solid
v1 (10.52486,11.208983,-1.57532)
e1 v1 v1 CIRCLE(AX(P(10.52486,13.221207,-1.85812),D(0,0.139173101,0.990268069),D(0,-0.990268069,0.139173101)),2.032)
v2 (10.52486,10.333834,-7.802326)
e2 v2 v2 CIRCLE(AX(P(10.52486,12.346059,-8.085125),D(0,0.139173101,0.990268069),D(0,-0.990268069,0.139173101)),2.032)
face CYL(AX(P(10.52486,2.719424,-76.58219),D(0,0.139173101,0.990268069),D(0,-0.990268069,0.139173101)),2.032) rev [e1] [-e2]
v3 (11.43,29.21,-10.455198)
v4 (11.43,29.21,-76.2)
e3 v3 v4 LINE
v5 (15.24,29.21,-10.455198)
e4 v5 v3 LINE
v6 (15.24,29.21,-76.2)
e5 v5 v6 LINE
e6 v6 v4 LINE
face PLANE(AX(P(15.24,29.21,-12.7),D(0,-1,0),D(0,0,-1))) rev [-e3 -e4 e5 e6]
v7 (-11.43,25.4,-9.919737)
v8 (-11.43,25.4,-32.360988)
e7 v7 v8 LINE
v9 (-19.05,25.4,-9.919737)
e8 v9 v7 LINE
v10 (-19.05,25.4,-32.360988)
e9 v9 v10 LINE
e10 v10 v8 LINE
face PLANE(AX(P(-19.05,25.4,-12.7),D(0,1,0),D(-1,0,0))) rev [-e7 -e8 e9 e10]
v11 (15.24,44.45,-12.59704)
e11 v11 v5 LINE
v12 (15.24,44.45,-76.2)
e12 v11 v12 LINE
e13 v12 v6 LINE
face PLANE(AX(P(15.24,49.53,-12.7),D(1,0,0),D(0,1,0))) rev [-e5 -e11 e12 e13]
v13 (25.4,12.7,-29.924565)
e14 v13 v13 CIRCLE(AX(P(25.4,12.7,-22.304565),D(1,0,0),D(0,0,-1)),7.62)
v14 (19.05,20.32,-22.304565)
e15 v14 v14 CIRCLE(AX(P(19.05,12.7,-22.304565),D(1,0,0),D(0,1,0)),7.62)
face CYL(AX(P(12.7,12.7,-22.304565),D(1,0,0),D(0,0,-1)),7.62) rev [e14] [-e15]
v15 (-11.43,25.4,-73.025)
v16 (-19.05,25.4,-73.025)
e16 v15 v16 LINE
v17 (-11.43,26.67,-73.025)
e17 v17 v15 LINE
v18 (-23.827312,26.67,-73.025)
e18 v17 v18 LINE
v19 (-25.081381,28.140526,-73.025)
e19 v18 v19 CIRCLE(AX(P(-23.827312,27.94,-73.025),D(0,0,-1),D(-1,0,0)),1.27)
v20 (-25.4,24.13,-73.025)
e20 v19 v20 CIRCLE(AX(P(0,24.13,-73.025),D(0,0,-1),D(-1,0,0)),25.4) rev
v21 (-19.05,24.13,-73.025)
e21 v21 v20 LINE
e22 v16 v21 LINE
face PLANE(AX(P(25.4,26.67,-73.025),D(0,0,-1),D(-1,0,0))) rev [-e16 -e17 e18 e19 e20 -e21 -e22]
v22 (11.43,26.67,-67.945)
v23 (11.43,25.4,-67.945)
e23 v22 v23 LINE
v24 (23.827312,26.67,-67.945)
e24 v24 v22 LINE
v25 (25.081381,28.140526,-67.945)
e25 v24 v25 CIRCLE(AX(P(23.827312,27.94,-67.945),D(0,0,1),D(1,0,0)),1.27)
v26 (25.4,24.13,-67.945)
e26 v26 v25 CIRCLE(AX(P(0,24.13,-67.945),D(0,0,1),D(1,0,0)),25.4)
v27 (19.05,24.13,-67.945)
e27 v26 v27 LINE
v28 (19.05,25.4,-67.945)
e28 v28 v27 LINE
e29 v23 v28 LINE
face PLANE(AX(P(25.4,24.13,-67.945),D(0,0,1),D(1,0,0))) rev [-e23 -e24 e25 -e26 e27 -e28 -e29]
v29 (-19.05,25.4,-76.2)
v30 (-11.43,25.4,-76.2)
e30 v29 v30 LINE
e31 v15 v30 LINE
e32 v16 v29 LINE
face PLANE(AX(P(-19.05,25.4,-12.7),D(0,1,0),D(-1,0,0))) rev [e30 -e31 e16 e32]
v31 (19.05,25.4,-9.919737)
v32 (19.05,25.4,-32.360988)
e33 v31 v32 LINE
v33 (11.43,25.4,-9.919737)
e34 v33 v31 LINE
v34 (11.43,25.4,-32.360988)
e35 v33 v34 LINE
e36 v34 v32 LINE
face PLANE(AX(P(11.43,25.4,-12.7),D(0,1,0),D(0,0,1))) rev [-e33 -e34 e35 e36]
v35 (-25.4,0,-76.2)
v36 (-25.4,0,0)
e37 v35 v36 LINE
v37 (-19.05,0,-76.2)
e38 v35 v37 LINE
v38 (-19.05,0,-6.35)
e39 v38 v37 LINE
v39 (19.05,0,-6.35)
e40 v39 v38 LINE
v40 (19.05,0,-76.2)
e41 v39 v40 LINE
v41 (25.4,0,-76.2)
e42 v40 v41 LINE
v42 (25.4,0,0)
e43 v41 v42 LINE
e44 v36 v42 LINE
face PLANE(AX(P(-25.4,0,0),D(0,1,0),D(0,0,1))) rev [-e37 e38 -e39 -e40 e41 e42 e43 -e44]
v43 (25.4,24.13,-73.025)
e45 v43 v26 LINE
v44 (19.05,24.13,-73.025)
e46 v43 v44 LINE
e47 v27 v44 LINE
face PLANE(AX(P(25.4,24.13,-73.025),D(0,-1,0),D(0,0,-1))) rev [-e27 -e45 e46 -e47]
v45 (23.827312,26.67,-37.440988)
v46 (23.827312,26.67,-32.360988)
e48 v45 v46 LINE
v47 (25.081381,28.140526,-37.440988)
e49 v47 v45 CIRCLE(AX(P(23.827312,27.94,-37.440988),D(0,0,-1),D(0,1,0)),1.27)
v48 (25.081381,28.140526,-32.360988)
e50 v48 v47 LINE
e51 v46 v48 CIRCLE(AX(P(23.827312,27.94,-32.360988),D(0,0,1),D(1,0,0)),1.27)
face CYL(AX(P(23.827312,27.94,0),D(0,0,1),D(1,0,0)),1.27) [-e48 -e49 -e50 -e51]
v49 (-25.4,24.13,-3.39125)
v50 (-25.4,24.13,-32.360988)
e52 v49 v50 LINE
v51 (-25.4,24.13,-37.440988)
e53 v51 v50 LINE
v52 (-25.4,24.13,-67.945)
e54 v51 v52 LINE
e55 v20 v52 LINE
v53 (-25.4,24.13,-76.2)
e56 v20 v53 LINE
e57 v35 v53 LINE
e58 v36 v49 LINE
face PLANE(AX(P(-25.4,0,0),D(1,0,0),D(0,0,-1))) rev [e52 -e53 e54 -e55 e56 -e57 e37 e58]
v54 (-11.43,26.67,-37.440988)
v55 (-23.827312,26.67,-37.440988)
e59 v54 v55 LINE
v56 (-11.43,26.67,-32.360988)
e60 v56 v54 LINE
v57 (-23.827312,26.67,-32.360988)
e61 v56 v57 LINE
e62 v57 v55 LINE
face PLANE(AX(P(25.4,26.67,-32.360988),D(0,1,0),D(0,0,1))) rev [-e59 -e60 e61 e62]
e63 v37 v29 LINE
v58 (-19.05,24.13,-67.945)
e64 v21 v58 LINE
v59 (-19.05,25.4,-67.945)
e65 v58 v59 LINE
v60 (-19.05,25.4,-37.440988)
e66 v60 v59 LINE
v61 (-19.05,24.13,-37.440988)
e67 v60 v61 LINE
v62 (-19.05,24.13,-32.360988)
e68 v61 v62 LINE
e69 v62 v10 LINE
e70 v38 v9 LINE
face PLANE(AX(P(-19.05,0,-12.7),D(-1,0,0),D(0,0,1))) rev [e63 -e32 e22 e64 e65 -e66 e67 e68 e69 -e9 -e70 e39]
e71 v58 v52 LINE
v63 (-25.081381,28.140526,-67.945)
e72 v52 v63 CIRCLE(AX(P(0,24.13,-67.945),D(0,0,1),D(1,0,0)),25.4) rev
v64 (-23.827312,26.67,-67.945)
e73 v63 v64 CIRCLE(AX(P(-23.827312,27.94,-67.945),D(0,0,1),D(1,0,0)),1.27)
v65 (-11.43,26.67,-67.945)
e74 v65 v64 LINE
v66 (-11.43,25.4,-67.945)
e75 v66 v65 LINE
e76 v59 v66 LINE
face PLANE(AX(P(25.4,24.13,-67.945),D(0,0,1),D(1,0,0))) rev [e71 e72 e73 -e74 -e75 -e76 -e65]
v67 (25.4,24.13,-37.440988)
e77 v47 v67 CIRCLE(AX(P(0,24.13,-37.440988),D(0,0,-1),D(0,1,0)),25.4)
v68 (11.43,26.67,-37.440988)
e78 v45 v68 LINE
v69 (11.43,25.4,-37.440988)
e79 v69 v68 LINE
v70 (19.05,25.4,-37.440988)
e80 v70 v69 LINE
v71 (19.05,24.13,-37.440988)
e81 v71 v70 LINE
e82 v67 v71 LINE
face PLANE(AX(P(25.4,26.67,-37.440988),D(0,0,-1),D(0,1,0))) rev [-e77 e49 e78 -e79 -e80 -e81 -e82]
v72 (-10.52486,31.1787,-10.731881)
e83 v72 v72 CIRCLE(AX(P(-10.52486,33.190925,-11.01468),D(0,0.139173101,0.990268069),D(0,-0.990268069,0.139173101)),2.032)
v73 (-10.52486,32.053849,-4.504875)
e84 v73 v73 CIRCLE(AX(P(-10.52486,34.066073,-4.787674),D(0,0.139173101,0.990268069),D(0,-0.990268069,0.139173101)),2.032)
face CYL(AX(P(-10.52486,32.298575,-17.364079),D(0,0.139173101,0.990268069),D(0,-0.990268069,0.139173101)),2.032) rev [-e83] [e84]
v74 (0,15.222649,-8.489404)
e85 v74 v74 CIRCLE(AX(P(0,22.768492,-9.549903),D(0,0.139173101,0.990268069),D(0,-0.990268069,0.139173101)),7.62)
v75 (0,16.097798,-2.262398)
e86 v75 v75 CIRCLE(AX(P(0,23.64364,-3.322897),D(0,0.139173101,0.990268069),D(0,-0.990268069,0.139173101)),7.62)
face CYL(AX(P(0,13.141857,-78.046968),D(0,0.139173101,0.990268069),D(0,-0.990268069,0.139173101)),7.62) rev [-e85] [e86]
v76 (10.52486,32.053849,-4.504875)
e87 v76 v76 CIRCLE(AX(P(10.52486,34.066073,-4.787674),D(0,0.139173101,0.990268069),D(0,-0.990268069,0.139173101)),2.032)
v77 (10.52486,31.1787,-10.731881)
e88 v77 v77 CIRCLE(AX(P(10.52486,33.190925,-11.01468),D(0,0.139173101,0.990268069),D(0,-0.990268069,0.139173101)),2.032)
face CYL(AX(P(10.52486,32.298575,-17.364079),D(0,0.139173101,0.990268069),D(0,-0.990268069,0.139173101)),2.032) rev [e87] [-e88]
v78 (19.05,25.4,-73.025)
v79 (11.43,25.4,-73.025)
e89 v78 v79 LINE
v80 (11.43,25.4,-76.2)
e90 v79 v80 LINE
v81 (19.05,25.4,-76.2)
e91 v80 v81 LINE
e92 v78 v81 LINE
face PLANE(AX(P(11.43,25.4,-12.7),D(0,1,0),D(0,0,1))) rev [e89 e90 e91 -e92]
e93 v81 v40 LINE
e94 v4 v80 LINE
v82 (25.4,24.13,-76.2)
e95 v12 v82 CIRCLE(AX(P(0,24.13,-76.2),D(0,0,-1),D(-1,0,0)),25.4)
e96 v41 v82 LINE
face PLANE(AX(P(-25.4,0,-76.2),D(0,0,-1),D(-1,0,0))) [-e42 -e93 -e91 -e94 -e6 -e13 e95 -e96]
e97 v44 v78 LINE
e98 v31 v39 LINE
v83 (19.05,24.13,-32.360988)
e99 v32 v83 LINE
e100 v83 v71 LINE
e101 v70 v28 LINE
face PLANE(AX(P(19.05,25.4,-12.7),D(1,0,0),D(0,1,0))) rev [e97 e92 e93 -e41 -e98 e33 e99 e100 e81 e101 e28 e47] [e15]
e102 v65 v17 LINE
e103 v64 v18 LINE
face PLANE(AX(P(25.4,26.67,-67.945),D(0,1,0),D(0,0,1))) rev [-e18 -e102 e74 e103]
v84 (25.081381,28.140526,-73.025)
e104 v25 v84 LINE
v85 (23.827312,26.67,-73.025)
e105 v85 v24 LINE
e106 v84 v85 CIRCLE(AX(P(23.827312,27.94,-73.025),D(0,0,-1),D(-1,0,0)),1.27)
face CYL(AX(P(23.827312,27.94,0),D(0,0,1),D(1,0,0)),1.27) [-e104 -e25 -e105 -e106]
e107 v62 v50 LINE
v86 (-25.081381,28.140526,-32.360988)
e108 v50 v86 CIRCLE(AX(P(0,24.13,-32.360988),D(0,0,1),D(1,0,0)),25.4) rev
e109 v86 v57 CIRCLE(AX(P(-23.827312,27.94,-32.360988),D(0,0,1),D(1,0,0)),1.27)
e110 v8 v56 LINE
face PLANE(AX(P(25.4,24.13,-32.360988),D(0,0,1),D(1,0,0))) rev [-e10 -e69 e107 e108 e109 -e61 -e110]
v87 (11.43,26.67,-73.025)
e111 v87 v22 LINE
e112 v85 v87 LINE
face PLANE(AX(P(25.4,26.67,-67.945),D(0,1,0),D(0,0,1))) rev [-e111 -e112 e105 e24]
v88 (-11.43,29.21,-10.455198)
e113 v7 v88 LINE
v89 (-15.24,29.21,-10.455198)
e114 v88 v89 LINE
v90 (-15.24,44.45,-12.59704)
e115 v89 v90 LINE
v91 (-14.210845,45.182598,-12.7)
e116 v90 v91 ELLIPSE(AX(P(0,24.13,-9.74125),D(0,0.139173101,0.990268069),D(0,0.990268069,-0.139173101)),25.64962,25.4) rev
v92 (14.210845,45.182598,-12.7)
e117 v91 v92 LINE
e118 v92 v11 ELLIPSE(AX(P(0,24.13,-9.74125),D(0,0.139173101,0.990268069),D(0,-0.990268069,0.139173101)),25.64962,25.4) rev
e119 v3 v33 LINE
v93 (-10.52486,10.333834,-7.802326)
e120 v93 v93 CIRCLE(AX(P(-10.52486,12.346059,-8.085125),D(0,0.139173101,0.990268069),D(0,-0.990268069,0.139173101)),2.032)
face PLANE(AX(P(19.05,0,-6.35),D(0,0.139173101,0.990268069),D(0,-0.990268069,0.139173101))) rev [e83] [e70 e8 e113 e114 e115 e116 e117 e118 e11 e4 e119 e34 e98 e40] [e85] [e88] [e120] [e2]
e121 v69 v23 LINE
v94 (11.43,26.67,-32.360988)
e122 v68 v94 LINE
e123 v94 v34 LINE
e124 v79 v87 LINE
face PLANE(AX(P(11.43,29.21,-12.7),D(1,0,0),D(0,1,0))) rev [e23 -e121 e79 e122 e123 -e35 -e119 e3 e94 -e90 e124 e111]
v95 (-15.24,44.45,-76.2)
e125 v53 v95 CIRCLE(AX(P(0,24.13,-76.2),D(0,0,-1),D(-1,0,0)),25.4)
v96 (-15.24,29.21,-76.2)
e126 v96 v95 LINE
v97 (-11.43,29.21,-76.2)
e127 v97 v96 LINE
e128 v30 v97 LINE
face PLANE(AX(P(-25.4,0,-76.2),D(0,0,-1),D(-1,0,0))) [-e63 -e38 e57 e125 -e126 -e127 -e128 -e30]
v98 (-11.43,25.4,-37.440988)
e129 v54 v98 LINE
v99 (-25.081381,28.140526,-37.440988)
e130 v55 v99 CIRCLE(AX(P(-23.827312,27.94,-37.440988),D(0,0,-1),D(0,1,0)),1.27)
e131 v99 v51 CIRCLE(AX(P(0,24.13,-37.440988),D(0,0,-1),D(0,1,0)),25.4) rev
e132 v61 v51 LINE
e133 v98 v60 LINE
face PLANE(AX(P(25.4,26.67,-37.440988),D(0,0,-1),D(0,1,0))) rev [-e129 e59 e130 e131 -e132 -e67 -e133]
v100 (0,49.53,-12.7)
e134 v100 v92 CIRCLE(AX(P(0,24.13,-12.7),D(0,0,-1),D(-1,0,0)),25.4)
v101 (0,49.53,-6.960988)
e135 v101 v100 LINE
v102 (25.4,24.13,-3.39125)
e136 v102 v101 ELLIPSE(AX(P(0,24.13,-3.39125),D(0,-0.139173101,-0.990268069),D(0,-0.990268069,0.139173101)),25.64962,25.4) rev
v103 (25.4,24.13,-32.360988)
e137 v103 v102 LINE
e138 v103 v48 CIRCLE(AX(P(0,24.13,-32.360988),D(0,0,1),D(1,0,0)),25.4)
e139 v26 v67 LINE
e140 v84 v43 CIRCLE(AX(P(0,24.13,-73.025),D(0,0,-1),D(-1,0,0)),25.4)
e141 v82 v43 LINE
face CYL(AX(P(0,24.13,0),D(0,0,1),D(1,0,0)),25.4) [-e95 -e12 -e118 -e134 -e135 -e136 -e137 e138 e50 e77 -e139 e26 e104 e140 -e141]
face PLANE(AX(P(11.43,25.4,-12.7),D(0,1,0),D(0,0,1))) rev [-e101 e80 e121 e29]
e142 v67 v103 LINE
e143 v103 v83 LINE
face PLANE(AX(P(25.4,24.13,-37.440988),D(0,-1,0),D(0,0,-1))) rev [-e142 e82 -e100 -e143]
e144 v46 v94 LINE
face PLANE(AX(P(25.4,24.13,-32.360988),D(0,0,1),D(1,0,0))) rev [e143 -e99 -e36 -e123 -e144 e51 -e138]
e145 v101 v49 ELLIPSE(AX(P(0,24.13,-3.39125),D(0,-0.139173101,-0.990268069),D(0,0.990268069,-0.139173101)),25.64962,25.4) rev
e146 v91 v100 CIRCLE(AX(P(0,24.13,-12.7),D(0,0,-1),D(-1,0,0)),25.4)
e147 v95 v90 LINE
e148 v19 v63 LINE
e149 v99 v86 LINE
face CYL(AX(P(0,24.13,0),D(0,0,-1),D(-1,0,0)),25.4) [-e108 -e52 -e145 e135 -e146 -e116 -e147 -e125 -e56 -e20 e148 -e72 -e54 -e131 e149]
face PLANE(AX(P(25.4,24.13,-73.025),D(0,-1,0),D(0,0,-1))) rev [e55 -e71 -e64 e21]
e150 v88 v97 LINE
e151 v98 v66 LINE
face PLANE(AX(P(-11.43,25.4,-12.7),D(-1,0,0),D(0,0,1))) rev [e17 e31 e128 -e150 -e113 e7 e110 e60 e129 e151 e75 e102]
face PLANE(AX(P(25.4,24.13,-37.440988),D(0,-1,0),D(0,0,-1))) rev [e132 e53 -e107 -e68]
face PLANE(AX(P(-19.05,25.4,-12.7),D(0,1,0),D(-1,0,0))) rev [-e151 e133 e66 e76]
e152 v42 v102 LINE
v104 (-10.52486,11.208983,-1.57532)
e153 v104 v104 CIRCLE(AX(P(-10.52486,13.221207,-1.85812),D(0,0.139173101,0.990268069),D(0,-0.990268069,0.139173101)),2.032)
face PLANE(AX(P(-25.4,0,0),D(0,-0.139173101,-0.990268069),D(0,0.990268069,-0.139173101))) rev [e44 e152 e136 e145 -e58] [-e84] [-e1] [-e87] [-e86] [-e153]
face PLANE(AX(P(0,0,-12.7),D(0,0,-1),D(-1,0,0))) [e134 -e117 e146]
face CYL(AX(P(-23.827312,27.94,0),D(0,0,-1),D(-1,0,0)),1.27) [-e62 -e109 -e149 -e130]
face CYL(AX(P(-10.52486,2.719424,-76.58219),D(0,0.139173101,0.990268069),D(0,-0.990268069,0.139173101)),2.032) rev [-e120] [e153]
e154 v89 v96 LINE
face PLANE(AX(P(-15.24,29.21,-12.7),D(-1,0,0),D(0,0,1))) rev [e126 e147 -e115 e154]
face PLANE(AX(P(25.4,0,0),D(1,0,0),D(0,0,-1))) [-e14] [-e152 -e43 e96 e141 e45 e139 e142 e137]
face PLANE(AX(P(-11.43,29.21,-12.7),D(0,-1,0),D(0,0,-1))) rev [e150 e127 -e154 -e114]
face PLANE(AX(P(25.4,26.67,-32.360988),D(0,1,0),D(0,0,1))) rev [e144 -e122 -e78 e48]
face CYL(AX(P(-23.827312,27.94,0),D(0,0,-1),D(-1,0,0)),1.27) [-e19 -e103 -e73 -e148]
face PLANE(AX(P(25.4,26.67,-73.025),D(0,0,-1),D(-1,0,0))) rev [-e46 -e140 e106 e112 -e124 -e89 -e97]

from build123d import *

# Parameters (mm, degrees)
BOSS_EXTRUDE1_DEPTH      = 25.4
BOSS_EXTRUDE1_DEPTH_BACK = 25.4
SKETCH3_R                = 8.382
CUT_EXTRUDE9_DEPTH       = 95.36535858
CUT_EXTRUDE14_DEPTH      = 63.5
SKETCH14_W               = 38.1
SKETCH14_H               = 46.622003784
CUT_EXTRUDE23_DEPTH      = 12.7
CUT_EXTRUDE23_DRAFT      = -8
SKETCH13_W               = 5.08
SKETCH13_H               = 2.54
CUT_EXTRUDE22_DEPTH      = 105.116765701
FILLET4_R                = 25.4
CUT_EXTRUDE24_REACH      = 96.365
SKETCH17_R               = 7.62
SKETCH17_R_2             = 2.032
CUT_EXTRUDE25_DEPTH      = 95.36535858
FILLET5_R                = 1.27
SKETCH17_7_R             = 2.032
CUT_EXTRUDE26_DEPTH      = 12.7
SKETCH18_R               = 7.62
CUT_EXTRUDE27_DEPTH      = 12.7


with BuildPart() as part:
    # Sketch1 → Boss-Extrude1 (new, two sides: drawn at the far end of the back side and taken through both)
    with BuildSketch(Plane(origin=(0, 0, 0), x_dir=(0, 0, -1), z_dir=(1, 0, 0)).offset(-BOSS_EXTRUDE1_DEPTH_BACK)):
        Polygon((0, 0), (6.960987543, 49.53), (76.2, 49.53), (76.2, 0), align=None)
    extrude(amount=BOSS_EXTRUDE1_DEPTH + BOSS_EXTRUDE1_DEPTH_BACK)

    # Sketch3 → Cut-Extrude9 (cut, through all)
    with BuildSketch(Plane.XZ):
        with Locations(Location((0, -63.246, 0), (0, 0, 270))):
            Circle(SKETCH3_R)
        with Locations(Location((0, -25.4, 0), (0, 0, 270))):
            Circle(SKETCH3_R)
    extrude(amount=-CUT_EXTRUDE9_DEPTH, mode=Mode.SUBTRACT)

    # Sketch9 → Cut-Extrude14 (cut)
    with BuildSketch(Plane(origin=(0, 0, -76.2), x_dir=(-1, 0, 0), z_dir=(0, 0, -1))):
        Polygon((-15.24, 49.53), (-15.24, 29.21), (-11.43, 29.21), (-11.43, 25.4), (-19.05, 25.4), (-19.05, 0), (19.05, 0), (19.05, 25.4), (11.43, 25.4), (11.43, 29.21), (15.24, 29.21), (15.24, 49.53), align=None)
    extrude(amount=-CUT_EXTRUDE14_DEPTH, mode=Mode.SUBTRACT)


with BuildPart() as cut_extrude23_tool:
    # Sketch14 → Cut-Extrude23 (with draft: the straight prism first)
    with BuildSketch(Plane.XZ):
        with Locations((0, -29.661001892)):
            Rectangle(SKETCH14_W, SKETCH14_H)
    extrude(amount=-CUT_EXTRUDE23_DEPTH)
    # Cut-Extrude23: the draft: its side faces are tilted about the plane it starts from
    cut_extrude23_sides = [cut_extrude23_tool.faces().sort_by_distance(p)[0] for p in [
        (0, 6.35, -6.35),
        (-19.05, 6.35, -29.661001892),
        (0, 6.35, -52.972003784),
        (19.05, 6.35, -29.661001892),
    ]]
    draft(cut_extrude23_sides, Plane.XZ, CUT_EXTRUDE23_DRAFT)


with BuildPart() as part_1:
    add(part.part)

    # Cut-Extrude23: cut by cut_extrude23_tool
    add(cut_extrude23_tool.part, mode=Mode.SUBTRACT)

    # Sketch13 → Cut-Extrude22 (cut, through all)
    with BuildSketch(Plane.ZY.offset(25.4)):
        with Locations((-70.485, 25.4)):
            Rectangle(SKETCH13_W, SKETCH13_H)
        with Locations((-34.900987543, 25.4)):
            Rectangle(SKETCH13_W, SKETCH13_H)
    extrude(amount=-CUT_EXTRUDE22_DEPTH, mode=Mode.SUBTRACT)

    # Fillet4
    # the kernel refuses this fillet: 25.4 mm, written as the material it takes off along each edge
    with BuildSketch(Plane(origin=(-25.4, 49.53, 56.539012457), x_dir=(1, 0, 0), z_dir=(0, 0, -1)), Plane(origin=(25.4, 49.53, 56.539012457), x_dir=(0, -1, 0), z_dir=(0, 0, -1))) as fillet4_piece_1:
        with BuildLine():
            CenterArc((FILLET4_R, FILLET4_R), FILLET4_R, 180, 90)
            Line((0, FILLET4_R), (0, 0))
            Line((0, 0), (FILLET4_R, 0))
        make_face()
    extrude(amount=196.239012457, mode=Mode.SUBTRACT)

    # Cut-Extrude24: up to this face of the body (flat: up to its plane)
    cut_extrude24_end = Plane(part_1.part.faces().sort_by_distance((0, 6.245967005, -7.227813416))[0])
    # Sketch9<4> → Cut-Extrude24 (cut, up to the picked face)
    with BuildSketch(Plane(origin=(0, 0, -76.2), x_dir=(-1, 0, 0), z_dir=(0, 0, -1)), mode=Mode.PRIVATE) as cut_extrude24_sk1:
        Polygon((-15.24, 49.53), (-15.24, 29.21), (-11.43, 29.21), (-11.43, 25.4), (-19.05, 25.4), (-19.05, 0), (19.05, 0), (19.05, 25.4), (11.43, 25.4), (11.43, 29.21), (15.24, 29.21), (15.24, 49.53), align=None)
    cut_extrude24_tool1 = split(extrude(cut_extrude24_sk1.sketch, amount=-CUT_EXTRUDE24_REACH, mode=Mode.PRIVATE), bisect_by=cut_extrude24_end, keep=Keep.BOTH, mode=Mode.PRIVATE)
    add(cut_extrude24_tool1.solids().sort_by(Axis((0, 23.326156, -76.2), (0, 0, 1)))[0], mode=Mode.SUBTRACT)

    # Sketch17 → Cut-Extrude25 (cut, through all)
    with BuildSketch(Plane(origin=(0, 0, 0), x_dir=(1, 0, 0), z_dir=(0, 0.13917310096006918, 0.9902680687415698))):
        with Locations(Location((0, 23.876, 0), (0, 0, 270))):
            Circle(SKETCH17_R)
        with Locations(Location((10.524860174, 13.351139826, 0), (0, 0, 270))):
            Circle(SKETCH17_R_2)
        with Locations(Location((-10.524860174, 13.351139826, 0), (0, 0, 270))):
            Circle(SKETCH17_R_2)
    extrude(amount=-CUT_EXTRUDE25_DEPTH, mode=Mode.SUBTRACT)

    # Fillet5
    fillet5_edges = [part_1.edges().sort_by_distance(p)[0] for p in [
        (25.272680903, 26.67, -70.485),
        (-25.272680903, 26.67, -70.485),
        (25.272680903, 26.67, -34.900987543),
        (-25.272680903, 26.67, -34.900987543),
    ]]
    fillet(fillet5_edges, radius=FILLET5_R)

    # Sketch17<7> → Cut-Extrude26 (cut)
    with BuildSketch(Plane(origin=(0, 0, 0), x_dir=(1, 0, 0), z_dir=(0, 0.13917310096006918, 0.9902680687415698))):
        with Locations(Location((10.524860174, 34.400860174, 0), (0, 0, 270))):
            Circle(SKETCH17_7_R)
        with Locations(Location((-10.524860174, 34.400860174, 0), (0, 0, 270))):
            Circle(SKETCH17_7_R)
    extrude(amount=-CUT_EXTRUDE26_DEPTH, mode=Mode.SUBTRACT)

    # Sketch18 → Cut-Extrude27 (cut)
    with BuildSketch(Plane(origin=(25.4, 0, 0), x_dir=(0, 0, -1), z_dir=(1, 0, 0))):
        with Locations((22.304564874, 12.7)):
            Circle(SKETCH18_R)
    extrude(amount=-CUT_EXTRUDE27_DEPTH, mode=Mode.SUBTRACT)


solid = part_1.part
